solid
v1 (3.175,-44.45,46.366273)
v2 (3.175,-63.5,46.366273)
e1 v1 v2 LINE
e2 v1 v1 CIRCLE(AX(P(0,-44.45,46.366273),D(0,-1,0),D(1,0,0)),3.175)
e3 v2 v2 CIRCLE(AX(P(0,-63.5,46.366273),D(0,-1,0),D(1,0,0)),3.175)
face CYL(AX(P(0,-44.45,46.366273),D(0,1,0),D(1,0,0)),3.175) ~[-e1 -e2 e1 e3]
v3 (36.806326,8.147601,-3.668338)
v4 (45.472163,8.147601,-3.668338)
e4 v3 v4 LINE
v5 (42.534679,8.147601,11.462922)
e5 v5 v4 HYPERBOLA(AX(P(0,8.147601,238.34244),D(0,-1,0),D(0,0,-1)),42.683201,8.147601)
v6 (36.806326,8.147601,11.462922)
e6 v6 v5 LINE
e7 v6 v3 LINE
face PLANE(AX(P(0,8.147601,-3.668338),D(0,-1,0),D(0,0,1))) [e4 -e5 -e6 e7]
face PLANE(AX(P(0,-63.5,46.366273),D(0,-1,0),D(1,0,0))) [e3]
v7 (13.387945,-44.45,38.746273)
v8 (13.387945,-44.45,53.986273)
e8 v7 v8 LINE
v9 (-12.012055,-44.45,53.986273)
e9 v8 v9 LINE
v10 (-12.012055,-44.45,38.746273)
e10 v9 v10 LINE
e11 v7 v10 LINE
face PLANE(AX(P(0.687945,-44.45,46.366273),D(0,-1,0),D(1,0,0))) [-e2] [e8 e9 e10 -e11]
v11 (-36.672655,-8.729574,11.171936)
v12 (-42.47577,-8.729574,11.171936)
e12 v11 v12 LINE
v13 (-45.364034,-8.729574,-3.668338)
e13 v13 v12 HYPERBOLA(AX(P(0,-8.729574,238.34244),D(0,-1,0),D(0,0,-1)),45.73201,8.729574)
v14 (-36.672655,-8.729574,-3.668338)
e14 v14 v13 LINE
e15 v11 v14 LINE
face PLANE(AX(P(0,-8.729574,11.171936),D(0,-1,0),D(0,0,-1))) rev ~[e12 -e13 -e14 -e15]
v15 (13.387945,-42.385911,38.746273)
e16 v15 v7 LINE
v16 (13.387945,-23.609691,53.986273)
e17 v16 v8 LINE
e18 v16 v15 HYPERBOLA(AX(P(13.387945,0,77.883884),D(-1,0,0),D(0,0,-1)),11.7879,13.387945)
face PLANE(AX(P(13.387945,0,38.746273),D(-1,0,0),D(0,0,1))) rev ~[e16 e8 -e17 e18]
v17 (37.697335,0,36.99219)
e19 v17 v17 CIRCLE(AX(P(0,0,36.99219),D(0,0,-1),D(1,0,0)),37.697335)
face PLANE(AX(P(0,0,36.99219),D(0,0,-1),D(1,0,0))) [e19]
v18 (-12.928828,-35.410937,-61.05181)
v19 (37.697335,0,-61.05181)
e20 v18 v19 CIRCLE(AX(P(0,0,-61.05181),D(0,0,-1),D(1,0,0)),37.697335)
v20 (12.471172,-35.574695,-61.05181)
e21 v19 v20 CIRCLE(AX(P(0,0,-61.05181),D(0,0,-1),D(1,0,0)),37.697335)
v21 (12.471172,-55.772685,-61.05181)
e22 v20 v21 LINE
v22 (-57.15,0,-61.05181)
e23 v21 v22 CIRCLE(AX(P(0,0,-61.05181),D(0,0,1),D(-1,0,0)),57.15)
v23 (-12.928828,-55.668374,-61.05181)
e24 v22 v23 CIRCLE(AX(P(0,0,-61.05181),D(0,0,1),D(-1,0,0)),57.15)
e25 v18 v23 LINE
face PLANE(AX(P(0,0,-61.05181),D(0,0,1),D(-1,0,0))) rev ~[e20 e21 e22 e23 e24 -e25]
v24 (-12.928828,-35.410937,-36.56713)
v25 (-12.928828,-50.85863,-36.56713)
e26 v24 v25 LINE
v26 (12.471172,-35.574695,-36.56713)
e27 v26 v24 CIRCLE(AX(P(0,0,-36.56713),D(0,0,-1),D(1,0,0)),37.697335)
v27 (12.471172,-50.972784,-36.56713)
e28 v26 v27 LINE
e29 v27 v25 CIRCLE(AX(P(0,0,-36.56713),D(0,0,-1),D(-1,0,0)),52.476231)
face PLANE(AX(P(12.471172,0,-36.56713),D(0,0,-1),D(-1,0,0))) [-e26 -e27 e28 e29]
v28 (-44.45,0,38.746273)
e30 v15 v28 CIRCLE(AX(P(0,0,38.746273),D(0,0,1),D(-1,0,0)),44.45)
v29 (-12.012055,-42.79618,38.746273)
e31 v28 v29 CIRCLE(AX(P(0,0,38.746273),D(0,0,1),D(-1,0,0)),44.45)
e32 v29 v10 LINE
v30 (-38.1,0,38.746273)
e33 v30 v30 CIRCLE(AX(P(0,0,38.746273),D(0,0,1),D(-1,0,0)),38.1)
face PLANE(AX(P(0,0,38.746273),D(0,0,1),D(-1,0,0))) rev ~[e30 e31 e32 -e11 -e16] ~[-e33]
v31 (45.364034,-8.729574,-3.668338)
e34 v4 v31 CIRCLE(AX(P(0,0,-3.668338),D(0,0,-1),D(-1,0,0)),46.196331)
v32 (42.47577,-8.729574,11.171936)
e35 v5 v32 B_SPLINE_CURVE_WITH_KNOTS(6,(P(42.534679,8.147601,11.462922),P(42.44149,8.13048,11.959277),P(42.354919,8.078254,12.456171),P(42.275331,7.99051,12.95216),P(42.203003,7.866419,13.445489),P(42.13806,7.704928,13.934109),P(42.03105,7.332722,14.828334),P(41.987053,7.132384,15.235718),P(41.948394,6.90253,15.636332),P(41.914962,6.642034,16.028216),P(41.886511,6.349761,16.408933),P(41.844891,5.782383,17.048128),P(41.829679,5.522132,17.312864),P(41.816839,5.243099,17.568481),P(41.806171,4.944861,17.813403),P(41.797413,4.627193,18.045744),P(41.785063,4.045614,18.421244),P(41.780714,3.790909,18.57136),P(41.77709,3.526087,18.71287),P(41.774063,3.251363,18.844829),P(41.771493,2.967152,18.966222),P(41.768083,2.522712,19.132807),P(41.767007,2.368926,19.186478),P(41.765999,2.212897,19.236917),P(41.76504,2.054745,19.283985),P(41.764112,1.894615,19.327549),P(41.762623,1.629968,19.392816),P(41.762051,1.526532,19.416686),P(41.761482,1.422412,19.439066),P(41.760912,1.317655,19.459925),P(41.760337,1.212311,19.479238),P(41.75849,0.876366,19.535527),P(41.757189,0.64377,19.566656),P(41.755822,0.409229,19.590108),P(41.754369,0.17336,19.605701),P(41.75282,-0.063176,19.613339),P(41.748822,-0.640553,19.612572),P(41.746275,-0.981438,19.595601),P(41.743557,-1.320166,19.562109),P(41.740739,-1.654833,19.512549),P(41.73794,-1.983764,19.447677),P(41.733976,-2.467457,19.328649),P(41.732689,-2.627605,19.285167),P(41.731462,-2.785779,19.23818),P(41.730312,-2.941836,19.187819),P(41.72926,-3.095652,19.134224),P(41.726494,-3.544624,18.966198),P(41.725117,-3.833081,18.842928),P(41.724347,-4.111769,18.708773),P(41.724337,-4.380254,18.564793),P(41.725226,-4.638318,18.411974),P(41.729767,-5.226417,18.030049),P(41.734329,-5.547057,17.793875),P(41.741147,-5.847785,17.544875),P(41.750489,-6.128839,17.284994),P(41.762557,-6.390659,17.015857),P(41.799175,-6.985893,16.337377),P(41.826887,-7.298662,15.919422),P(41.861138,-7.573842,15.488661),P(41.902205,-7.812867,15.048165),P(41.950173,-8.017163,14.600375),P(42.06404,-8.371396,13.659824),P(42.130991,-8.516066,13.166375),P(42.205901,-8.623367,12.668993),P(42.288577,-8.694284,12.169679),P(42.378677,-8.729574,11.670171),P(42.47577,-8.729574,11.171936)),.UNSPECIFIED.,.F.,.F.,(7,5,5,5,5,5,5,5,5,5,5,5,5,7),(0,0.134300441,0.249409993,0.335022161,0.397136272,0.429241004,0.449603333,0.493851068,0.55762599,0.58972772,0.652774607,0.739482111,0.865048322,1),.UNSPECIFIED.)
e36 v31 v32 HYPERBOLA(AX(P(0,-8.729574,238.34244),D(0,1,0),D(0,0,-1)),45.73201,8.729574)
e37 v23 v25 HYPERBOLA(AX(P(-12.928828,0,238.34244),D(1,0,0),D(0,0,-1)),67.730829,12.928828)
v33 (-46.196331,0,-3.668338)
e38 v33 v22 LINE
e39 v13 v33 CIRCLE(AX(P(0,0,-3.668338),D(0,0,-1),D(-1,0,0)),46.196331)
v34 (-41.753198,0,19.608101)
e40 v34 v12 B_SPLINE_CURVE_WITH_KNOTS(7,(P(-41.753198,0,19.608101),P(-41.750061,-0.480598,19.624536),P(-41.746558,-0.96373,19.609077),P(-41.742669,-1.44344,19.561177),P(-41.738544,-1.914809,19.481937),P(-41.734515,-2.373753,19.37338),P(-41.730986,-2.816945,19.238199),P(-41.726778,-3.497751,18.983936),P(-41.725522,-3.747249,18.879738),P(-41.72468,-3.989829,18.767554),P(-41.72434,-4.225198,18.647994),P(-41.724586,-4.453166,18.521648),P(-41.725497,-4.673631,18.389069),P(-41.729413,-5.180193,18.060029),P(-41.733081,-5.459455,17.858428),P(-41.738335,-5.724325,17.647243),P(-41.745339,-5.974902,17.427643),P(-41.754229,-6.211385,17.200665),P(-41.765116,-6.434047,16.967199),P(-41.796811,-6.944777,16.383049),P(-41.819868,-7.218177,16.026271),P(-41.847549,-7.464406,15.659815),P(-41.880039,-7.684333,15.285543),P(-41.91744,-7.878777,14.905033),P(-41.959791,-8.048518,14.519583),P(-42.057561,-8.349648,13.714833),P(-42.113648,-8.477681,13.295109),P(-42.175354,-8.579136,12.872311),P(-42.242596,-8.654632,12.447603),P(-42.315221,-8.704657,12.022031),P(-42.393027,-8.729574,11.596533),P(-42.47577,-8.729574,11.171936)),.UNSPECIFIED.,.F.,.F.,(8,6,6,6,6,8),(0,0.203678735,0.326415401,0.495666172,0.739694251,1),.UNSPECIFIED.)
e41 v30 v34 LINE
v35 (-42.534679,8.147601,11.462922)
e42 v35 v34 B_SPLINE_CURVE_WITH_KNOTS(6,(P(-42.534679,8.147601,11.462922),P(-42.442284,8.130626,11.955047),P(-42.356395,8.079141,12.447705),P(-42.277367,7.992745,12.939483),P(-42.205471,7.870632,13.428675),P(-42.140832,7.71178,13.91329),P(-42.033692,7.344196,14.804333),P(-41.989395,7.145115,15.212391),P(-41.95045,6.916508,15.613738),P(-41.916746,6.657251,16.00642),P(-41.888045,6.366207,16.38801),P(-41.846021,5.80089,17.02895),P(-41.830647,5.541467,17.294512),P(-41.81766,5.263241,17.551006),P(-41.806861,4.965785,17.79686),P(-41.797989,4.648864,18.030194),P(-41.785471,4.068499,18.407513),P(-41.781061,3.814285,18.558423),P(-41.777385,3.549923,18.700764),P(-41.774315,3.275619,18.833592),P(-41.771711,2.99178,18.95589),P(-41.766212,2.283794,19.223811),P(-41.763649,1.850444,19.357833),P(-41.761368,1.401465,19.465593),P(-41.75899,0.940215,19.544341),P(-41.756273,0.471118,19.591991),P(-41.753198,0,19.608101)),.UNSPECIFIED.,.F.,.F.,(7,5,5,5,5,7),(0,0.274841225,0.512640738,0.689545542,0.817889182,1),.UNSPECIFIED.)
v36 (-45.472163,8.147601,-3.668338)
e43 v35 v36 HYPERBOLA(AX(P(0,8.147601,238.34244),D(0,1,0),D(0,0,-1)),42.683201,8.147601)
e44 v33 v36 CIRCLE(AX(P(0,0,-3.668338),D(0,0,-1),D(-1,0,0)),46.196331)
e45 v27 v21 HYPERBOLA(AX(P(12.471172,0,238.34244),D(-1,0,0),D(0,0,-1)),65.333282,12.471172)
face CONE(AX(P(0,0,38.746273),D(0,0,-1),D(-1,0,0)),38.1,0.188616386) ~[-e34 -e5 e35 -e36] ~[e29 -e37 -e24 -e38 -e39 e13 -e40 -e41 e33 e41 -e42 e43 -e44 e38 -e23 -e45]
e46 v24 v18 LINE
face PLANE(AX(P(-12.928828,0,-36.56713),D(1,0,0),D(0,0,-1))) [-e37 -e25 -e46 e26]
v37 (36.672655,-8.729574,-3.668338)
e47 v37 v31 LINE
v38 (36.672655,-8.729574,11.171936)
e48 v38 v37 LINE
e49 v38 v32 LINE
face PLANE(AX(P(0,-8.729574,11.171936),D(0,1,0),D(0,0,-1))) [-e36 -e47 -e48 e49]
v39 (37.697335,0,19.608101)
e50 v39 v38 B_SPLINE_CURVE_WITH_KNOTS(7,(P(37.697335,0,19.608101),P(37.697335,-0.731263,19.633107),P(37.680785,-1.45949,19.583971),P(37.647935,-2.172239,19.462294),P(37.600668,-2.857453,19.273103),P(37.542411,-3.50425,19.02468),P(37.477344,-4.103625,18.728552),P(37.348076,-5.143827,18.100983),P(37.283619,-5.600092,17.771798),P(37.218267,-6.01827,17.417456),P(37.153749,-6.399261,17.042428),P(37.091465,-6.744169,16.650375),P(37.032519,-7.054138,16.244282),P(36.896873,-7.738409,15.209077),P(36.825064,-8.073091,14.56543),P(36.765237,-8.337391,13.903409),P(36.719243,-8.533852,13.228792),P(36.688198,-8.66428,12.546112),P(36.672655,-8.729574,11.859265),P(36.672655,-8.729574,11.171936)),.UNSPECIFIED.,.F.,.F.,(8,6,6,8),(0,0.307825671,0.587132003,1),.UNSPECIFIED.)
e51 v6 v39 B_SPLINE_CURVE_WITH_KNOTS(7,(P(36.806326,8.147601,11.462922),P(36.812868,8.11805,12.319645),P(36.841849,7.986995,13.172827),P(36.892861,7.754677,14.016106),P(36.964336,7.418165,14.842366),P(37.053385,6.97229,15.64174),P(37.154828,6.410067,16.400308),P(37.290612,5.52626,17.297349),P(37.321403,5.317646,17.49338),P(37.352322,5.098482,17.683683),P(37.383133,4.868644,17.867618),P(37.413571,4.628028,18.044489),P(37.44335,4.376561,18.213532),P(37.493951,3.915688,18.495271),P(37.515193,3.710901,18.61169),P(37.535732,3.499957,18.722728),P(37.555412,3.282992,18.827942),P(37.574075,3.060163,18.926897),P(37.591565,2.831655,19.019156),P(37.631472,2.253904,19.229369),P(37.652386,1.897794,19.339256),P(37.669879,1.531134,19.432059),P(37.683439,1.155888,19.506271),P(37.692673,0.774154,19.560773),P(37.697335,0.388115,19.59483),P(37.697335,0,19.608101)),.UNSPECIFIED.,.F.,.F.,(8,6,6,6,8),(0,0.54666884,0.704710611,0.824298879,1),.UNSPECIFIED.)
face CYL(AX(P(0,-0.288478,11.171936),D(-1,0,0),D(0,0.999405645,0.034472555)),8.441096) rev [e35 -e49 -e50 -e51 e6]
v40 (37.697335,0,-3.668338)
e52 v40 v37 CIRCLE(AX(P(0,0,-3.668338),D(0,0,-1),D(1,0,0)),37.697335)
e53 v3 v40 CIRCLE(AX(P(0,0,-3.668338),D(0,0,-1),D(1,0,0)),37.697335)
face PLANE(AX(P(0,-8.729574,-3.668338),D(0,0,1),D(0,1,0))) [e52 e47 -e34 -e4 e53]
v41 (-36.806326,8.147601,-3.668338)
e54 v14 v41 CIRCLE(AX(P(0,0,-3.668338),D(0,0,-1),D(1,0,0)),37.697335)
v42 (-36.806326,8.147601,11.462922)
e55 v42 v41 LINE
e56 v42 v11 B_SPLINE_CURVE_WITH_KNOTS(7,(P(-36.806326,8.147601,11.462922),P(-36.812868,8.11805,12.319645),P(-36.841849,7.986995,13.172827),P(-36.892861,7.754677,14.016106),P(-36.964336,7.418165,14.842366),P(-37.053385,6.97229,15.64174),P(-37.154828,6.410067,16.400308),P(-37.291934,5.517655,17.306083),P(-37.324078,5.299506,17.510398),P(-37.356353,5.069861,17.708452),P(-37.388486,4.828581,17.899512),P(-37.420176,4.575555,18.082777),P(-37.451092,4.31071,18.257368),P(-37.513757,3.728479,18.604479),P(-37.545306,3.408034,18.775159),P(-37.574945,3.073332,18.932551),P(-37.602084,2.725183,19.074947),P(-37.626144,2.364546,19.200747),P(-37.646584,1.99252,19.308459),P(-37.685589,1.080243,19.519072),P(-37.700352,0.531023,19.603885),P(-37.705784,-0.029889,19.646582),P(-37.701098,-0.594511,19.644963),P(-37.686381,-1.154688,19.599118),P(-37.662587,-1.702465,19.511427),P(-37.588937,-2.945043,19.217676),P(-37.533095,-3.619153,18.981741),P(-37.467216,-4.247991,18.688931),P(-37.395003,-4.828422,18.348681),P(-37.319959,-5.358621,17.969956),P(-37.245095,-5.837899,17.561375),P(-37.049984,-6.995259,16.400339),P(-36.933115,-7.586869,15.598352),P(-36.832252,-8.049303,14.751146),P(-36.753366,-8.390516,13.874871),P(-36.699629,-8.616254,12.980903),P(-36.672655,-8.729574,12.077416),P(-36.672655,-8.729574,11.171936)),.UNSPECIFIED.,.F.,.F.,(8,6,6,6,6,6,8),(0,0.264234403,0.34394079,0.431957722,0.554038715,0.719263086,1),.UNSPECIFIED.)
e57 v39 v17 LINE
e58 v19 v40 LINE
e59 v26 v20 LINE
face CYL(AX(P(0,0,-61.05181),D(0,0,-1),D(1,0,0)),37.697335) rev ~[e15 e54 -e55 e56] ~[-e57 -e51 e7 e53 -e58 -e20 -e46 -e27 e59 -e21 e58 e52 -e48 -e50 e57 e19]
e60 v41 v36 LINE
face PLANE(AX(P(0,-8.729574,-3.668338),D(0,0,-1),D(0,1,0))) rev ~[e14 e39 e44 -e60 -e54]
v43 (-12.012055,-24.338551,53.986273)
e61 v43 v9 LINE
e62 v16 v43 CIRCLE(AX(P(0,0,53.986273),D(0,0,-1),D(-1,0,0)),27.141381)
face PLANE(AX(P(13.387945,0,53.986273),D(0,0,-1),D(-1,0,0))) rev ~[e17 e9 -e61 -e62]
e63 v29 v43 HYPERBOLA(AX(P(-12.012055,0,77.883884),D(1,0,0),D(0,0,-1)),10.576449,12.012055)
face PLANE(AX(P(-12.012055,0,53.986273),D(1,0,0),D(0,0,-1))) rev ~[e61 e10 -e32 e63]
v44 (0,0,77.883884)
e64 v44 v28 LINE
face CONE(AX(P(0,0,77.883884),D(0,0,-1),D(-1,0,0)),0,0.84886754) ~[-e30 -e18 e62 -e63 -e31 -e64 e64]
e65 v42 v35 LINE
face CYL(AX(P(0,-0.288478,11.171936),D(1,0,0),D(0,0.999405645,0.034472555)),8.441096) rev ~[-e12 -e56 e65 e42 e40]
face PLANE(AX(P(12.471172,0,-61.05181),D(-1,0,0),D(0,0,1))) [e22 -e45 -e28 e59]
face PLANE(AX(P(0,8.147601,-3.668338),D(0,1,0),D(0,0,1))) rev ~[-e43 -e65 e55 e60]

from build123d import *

# Parameters (mm, degrees)
F3_DEPTH       = 87.884
F4_R           = 37.6973348858
F5_DEPTH       = 98.044
F7_DEPTH       = 44.45
F8_R           = 3.175
F9_DEPTH       = 19.05
F11_DEPTH      = 67.564
F11_DEPTH_BACK = 62.992


with BuildPart() as f1:
    # F0 (on Front) → F1 (revolve)
    with BuildSketch(Plane.XZ):
        Polygon((0, 38.7462731748), (-38.1, 38.7462731748), (-57.15, -61.0518104742), (0, -61.0518104742), align=None)
        Polygon((-44.45, 38.7462731748), (-38.1, 38.7462731748), (0, 38.7462731748), (0, 77.8838843107), align=None)
    revolve(axis=Axis((0, 0, -11.1527686497), (0, 0, 1)))

    # F2 (on Front) → F3 (cut)
    with BuildSketch(Plane.XZ):
        Polygon((12.4711716, -36.5671299331), (0, -36.5671299331), (-12.9288284, -36.5671299331), (-12.9288284, -61.0518104742), (0, -61.0518104742), (12.4711716, -61.0518104742), align=None)
    extrude(amount=F3_DEPTH, mode=Mode.SUBTRACT)

    # F4 (on face) → F5 (cut)
    with BuildSketch(Plane(origin=(0, 0, -61.0518104742), x_dir=(1, 0, 0), z_dir=(0, 0, -1))):
        Circle(F4_R)
    extrude(amount=-F5_DEPTH, mode=Mode.SUBTRACT)

    # F6 (on Front) → F7 (join)
    with BuildSketch(Plane.XZ):
        Polygon((-12.0120554089, 38.7462731748), (0, 38.7462731748), (13.3879445911, 38.7462731748), (13.3879445911, 53.9862731748), (0, 53.9862731748), (-12.0120554089, 53.9862731748), align=None)
    extrude(amount=F7_DEPTH)

    # F8 (on face) → F9 (join)
    with BuildSketch(Plane.XZ.offset(44.45)):
        with Locations((0, 46.3662731748)):
            Circle(F8_R)
    extrude(amount=F9_DEPTH)

    # F10 (on Right) → F11 (cut, two sides)
    with BuildSketch(Plane.YZ) as f11_sk:
        with BuildLine():
            ThreePointArc((8.1476010382, 11.462922208), (-0.4339928104, 19.6117778709), (-8.7295742705, 11.1719360575))
            Line((-8.7295742705, 11.1719360575), (-8.7295742705, -3.6683375947))
            Line((-8.7295742705, -3.6683375947), (8.1476010382, -3.6683375947))
            Line((8.1476010382, -3.6683375947), (8.1476010382, 11.462922208))
        make_face()
    extrude(amount=-F11_DEPTH, mode=Mode.SUBTRACT)
    extrude(f11_sk.sketch, amount=F11_DEPTH_BACK, mode=Mode.SUBTRACT)


solid = f1.part
